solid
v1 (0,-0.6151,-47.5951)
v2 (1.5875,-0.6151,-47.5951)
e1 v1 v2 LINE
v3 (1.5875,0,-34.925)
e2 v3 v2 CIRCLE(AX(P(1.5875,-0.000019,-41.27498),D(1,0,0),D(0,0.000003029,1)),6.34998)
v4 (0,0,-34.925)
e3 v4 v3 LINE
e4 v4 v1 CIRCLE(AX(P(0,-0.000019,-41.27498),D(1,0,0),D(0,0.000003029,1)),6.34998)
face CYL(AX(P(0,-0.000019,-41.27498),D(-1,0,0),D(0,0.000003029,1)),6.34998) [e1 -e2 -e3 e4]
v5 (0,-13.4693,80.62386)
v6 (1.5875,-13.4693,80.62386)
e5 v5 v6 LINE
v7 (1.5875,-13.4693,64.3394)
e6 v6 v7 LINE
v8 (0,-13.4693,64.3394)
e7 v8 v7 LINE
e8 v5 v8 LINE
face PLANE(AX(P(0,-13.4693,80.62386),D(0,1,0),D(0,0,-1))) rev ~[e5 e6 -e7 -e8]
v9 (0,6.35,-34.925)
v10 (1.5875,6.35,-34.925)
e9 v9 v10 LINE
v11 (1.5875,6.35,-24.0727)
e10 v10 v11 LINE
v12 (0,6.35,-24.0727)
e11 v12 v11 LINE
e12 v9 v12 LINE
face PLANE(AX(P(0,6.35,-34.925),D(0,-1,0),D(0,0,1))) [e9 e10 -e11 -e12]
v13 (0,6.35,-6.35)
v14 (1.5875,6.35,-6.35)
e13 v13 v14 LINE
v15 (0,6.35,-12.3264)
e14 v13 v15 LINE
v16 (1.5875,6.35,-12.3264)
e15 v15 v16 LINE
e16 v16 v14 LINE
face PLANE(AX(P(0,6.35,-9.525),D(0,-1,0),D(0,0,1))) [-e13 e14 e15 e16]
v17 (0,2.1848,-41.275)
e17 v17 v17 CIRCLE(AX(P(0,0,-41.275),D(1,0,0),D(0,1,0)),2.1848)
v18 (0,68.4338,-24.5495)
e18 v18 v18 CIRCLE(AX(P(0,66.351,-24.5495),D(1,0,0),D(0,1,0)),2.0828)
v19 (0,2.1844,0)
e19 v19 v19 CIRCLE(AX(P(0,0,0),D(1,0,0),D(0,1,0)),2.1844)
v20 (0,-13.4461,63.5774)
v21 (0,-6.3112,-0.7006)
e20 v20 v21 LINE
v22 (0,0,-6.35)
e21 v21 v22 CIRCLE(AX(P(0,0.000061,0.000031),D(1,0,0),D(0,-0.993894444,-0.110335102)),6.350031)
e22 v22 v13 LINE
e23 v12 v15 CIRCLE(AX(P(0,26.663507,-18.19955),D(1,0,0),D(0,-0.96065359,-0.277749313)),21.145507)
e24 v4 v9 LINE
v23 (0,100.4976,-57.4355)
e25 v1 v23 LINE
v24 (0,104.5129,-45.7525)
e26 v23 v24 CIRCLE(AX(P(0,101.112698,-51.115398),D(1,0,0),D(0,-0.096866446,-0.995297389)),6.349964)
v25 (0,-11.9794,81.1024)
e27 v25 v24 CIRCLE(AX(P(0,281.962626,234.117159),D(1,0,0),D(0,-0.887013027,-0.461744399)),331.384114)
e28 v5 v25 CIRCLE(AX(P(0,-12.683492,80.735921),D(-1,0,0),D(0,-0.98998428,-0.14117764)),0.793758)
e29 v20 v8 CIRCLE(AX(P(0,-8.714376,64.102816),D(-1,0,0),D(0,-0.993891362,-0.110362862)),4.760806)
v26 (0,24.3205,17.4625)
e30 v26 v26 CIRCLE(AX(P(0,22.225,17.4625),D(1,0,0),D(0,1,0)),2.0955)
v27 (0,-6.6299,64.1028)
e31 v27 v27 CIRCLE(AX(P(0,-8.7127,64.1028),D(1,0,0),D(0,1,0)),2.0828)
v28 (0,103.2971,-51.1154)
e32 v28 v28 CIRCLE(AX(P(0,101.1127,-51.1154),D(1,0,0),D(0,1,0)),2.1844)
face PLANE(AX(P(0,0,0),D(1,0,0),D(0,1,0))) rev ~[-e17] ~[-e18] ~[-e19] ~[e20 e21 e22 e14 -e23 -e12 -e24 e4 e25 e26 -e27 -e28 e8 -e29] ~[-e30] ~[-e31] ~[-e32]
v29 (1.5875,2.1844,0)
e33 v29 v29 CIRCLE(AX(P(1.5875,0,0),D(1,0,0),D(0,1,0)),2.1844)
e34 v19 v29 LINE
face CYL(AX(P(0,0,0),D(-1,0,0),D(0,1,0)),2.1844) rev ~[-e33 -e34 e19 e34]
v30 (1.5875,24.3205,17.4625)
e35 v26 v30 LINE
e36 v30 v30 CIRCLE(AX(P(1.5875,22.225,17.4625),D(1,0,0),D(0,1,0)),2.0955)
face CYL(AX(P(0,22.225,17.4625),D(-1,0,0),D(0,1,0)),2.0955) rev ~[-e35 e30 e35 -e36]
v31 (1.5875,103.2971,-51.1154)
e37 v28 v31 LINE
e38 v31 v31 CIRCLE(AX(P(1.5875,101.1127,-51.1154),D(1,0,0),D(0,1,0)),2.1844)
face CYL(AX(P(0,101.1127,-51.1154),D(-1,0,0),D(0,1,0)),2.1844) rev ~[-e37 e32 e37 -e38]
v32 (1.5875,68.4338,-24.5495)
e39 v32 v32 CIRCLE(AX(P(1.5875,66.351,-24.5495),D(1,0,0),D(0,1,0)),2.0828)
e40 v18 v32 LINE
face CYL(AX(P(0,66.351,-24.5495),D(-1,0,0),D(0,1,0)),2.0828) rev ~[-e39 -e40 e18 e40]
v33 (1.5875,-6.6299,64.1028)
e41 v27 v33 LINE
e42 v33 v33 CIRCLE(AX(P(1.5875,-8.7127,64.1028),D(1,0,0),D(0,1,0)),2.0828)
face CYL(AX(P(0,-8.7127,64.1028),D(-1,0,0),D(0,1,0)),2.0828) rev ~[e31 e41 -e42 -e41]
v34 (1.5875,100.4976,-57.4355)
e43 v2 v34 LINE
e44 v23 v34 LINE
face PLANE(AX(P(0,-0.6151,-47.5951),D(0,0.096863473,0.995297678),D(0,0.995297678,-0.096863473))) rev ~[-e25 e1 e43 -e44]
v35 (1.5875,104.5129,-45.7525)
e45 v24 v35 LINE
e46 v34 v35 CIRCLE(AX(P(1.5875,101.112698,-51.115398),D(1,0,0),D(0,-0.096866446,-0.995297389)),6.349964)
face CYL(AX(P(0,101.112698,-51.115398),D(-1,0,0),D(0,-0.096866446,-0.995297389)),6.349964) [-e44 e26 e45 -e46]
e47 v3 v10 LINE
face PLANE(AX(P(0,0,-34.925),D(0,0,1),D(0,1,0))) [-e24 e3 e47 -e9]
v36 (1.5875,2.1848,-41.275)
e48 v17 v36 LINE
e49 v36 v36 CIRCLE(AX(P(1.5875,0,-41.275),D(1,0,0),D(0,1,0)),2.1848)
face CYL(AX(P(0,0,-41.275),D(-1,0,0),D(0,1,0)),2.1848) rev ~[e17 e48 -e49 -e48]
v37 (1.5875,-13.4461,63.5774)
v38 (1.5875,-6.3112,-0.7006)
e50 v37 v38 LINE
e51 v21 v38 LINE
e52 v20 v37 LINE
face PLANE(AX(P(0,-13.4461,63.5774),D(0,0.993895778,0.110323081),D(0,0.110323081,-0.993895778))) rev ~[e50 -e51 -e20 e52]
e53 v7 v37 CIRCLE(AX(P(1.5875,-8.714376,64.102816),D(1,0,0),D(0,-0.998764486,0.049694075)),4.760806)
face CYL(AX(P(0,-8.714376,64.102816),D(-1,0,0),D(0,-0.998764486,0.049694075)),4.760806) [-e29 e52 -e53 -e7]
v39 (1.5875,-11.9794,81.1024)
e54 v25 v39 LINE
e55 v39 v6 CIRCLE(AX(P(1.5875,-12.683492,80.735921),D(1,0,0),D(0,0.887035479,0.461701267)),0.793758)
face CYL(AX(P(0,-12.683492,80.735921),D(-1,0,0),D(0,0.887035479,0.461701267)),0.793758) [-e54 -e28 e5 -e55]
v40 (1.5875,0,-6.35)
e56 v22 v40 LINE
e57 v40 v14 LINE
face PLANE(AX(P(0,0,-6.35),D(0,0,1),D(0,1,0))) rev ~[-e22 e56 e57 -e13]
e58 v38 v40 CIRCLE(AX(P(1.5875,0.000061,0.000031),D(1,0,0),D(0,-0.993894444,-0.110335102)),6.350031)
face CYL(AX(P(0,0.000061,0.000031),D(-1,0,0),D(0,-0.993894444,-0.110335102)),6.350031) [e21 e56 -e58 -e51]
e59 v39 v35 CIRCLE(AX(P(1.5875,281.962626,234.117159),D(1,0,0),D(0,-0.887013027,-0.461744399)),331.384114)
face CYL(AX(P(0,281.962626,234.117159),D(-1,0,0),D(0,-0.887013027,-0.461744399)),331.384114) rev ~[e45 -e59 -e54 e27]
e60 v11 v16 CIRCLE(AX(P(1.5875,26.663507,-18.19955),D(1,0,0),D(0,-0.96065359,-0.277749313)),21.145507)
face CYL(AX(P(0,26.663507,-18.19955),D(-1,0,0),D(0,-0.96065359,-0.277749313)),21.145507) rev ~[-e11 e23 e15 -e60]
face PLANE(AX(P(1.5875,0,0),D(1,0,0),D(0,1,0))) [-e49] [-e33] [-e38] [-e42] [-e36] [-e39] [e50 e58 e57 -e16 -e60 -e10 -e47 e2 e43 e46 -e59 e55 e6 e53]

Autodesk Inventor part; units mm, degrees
ref_plane "YZ Plane" through (0, 0, 0) normal (1, 0, 0) x (0, 1, 0)
ref_plane "XZ Plane" through (0, 0, 0) normal (0, 1, 0) x (-1, 0, 0)
ref_plane "XY Plane" through (0, 0, 0) normal (0, 0, 1) x (1, 0, 0)
sketch "main" plane through (0, 0, 0) normal (0, 0, 1) x (1, 0, 0)
  circle A0 centre (-198.1135, 49.9495) radius 2.1844
  circle A1 centre (-97.0008, -1.1659) radius 2.1
  arc A2 (-97.6159, -7.486) -> (-93.6005, 4.197) centre (-97.0008, -1.1659) ccw
  arc A3 (-204.4247, 49.249) -> (-198.1135, 43.5995) centre (-198.1135, 49.9495) ccw
  arc A4 (-210.0929, 131.0519) -> (-93.6005, 4.197) centre (83.8489, 284.0666) ccw
  circle A5 centre (-206.8262, 114.0524) radius 2.0828
  arc A6 (-210.0929, 131.0519) -> (-211.5759, 130.5326) centre (-210.797, 130.6854) ccw
  circle A7 centre (-131.7625, 25.4) radius 2.0828
  line L0 (-198.7286, 2.3544) -> (-97.6159, -7.486)
  circle A8 centre (-198.1135, 8.6745) radius 2.1848
  arc A9 (-198.1135, 15.0245) -> (-198.7286, 2.3544) centre (-198.1135, 8.6745) ccw
  line L1 (-211.5828, 130.7972) -> (-211.5828, 113.8158)
  arc A10 (-211.5828, 114.289) -> (-211.5596, 113.527) centre (-206.8262, 114.0524) ccw
  line L2 (-211.5596, 113.527) -> (-204.4247, 49.249)
  circle A11 centre (-175.8885, 67.412) radius 2.0955
  arc A12 (-191.7635, 25.8768) -> (-191.7635, 37.6232) centre (-171.45, 31.75) ccw
  line L3 (-191.7635, 43.5995) -> (-191.7635, 37.6232)
  line L4 (-191.7635, 15.0245) -> (-191.7635, 25.8768)
  point P0 (1.1251, 9.7944)
  point P1 (-211.9386, 134.6509)
  point P2 (-191.7635, 49.9495)
  dimension "d7" = 12.7
  dimension "d8" = 4.1656
  dimension "d9" = 6.35
  dimension "d13" = 4.1656
  dimension "d20" = 0
  dimension "d21" = 6.35
  dimension "d26" = 9.525
  dimension "d27" = 4.191
  dimension "d29" = 42.291
sketch "Sketch1" plane through (0, 0, 0) normal (1, 0, 0) x (0, 1, 0)
  line L0 (6.35, -9.525) -> (6.35, -7.9375) projected
  line L1 (0, -6.35) -> (6.35, -6.35)
  line L2 (0, -34.925) -> (6.35, -34.925)
  circle A0 centre (101.1127, -51.1154) radius 2.1844 projected
  circle A1 centre (0, 0) radius 2.1844
  circle A2 centre (101.1127, -51.1154) radius 2.1
  arc A3 (100.4976, -57.4355) -> (104.5129, -45.7525) centre (101.1127, -51.1154) ccw
  arc A4 (-6.3112, -0.7006) -> (0, -6.35) centre (0, 0) ccw
  arc A5 (-11.9794, 81.1024) -> (104.5129, -45.7525) centre (281.9624, 234.117) ccw
  circle A6 centre (-8.7127, 64.1028) radius 2.0828
  arc A7 (-11.9794, 81.1024) -> (-13.4624, 80.5831) centre (-12.6835, 80.7359) ccw
  circle A8 centre (66.351, -24.5495) radius 2.0828
  line L3 (-0.6151, -47.5951) -> (100.4976, -57.4355)
  circle A9 centre (0, -41.275) radius 2.1848
  arc A10 (0, -34.925) -> (-0.6151, -47.5951) centre (0, -41.275) ccw
  line L4 (-13.4693, 80.8476) -> (-13.4693, 63.8663)
  arc A11 (-13.4693, 64.3394) -> (-13.4461, 63.5774) centre (-8.7127, 64.1028) ccw
  line L5 (-13.4461, 63.5774) -> (-6.3112, -0.7006)
  circle A12 centre (22.225, 17.4625) radius 2.0955
  arc A13 (6.35, -24.0727) -> (6.35, -12.3264) centre (26.6635, -18.1995) ccw
  line L6 (6.35, -6.35) -> (6.35, -12.3264)
  line L7 (6.35, -34.925) -> (6.35, -24.0727)
  point P0 (0, -6.35)
  point P1 (0, -34.925)
  point P2 (-13.4693, 80.6241)
  point P3 (6.35, -6.35)
  point P4 (6.35, -34.925)
extrude "Extrusion1" add sketch "Sketch1" along normal blind 1.5875 contours L0 L6 L1 A4 L5 A11 L4 A7 A5 A3 L3 A10 L2 L7 A13 | A11 L4 | A7 L4
equation "\"BendRadius\" = Thickness"
equation "\"BendReliefWidth\" = Thickness"
equation "\"BendReliefDepth\" = 0.5 * Thickness"
equation "\"CornerReliefSize\" = 4 * Thickness"
equation "\"MinimumRemnant\" = 2 * Thickness"
equation "\"TransitionRadius\" = BendRadius"
equation "\"JacobiRadiusSize\" = BendRadius"
equation "\"GapSize\" = Thickness"
equation "\"Thickness\" = 1.5875"
properties part number "Ramp V2" material "Acetal Resin, White"
